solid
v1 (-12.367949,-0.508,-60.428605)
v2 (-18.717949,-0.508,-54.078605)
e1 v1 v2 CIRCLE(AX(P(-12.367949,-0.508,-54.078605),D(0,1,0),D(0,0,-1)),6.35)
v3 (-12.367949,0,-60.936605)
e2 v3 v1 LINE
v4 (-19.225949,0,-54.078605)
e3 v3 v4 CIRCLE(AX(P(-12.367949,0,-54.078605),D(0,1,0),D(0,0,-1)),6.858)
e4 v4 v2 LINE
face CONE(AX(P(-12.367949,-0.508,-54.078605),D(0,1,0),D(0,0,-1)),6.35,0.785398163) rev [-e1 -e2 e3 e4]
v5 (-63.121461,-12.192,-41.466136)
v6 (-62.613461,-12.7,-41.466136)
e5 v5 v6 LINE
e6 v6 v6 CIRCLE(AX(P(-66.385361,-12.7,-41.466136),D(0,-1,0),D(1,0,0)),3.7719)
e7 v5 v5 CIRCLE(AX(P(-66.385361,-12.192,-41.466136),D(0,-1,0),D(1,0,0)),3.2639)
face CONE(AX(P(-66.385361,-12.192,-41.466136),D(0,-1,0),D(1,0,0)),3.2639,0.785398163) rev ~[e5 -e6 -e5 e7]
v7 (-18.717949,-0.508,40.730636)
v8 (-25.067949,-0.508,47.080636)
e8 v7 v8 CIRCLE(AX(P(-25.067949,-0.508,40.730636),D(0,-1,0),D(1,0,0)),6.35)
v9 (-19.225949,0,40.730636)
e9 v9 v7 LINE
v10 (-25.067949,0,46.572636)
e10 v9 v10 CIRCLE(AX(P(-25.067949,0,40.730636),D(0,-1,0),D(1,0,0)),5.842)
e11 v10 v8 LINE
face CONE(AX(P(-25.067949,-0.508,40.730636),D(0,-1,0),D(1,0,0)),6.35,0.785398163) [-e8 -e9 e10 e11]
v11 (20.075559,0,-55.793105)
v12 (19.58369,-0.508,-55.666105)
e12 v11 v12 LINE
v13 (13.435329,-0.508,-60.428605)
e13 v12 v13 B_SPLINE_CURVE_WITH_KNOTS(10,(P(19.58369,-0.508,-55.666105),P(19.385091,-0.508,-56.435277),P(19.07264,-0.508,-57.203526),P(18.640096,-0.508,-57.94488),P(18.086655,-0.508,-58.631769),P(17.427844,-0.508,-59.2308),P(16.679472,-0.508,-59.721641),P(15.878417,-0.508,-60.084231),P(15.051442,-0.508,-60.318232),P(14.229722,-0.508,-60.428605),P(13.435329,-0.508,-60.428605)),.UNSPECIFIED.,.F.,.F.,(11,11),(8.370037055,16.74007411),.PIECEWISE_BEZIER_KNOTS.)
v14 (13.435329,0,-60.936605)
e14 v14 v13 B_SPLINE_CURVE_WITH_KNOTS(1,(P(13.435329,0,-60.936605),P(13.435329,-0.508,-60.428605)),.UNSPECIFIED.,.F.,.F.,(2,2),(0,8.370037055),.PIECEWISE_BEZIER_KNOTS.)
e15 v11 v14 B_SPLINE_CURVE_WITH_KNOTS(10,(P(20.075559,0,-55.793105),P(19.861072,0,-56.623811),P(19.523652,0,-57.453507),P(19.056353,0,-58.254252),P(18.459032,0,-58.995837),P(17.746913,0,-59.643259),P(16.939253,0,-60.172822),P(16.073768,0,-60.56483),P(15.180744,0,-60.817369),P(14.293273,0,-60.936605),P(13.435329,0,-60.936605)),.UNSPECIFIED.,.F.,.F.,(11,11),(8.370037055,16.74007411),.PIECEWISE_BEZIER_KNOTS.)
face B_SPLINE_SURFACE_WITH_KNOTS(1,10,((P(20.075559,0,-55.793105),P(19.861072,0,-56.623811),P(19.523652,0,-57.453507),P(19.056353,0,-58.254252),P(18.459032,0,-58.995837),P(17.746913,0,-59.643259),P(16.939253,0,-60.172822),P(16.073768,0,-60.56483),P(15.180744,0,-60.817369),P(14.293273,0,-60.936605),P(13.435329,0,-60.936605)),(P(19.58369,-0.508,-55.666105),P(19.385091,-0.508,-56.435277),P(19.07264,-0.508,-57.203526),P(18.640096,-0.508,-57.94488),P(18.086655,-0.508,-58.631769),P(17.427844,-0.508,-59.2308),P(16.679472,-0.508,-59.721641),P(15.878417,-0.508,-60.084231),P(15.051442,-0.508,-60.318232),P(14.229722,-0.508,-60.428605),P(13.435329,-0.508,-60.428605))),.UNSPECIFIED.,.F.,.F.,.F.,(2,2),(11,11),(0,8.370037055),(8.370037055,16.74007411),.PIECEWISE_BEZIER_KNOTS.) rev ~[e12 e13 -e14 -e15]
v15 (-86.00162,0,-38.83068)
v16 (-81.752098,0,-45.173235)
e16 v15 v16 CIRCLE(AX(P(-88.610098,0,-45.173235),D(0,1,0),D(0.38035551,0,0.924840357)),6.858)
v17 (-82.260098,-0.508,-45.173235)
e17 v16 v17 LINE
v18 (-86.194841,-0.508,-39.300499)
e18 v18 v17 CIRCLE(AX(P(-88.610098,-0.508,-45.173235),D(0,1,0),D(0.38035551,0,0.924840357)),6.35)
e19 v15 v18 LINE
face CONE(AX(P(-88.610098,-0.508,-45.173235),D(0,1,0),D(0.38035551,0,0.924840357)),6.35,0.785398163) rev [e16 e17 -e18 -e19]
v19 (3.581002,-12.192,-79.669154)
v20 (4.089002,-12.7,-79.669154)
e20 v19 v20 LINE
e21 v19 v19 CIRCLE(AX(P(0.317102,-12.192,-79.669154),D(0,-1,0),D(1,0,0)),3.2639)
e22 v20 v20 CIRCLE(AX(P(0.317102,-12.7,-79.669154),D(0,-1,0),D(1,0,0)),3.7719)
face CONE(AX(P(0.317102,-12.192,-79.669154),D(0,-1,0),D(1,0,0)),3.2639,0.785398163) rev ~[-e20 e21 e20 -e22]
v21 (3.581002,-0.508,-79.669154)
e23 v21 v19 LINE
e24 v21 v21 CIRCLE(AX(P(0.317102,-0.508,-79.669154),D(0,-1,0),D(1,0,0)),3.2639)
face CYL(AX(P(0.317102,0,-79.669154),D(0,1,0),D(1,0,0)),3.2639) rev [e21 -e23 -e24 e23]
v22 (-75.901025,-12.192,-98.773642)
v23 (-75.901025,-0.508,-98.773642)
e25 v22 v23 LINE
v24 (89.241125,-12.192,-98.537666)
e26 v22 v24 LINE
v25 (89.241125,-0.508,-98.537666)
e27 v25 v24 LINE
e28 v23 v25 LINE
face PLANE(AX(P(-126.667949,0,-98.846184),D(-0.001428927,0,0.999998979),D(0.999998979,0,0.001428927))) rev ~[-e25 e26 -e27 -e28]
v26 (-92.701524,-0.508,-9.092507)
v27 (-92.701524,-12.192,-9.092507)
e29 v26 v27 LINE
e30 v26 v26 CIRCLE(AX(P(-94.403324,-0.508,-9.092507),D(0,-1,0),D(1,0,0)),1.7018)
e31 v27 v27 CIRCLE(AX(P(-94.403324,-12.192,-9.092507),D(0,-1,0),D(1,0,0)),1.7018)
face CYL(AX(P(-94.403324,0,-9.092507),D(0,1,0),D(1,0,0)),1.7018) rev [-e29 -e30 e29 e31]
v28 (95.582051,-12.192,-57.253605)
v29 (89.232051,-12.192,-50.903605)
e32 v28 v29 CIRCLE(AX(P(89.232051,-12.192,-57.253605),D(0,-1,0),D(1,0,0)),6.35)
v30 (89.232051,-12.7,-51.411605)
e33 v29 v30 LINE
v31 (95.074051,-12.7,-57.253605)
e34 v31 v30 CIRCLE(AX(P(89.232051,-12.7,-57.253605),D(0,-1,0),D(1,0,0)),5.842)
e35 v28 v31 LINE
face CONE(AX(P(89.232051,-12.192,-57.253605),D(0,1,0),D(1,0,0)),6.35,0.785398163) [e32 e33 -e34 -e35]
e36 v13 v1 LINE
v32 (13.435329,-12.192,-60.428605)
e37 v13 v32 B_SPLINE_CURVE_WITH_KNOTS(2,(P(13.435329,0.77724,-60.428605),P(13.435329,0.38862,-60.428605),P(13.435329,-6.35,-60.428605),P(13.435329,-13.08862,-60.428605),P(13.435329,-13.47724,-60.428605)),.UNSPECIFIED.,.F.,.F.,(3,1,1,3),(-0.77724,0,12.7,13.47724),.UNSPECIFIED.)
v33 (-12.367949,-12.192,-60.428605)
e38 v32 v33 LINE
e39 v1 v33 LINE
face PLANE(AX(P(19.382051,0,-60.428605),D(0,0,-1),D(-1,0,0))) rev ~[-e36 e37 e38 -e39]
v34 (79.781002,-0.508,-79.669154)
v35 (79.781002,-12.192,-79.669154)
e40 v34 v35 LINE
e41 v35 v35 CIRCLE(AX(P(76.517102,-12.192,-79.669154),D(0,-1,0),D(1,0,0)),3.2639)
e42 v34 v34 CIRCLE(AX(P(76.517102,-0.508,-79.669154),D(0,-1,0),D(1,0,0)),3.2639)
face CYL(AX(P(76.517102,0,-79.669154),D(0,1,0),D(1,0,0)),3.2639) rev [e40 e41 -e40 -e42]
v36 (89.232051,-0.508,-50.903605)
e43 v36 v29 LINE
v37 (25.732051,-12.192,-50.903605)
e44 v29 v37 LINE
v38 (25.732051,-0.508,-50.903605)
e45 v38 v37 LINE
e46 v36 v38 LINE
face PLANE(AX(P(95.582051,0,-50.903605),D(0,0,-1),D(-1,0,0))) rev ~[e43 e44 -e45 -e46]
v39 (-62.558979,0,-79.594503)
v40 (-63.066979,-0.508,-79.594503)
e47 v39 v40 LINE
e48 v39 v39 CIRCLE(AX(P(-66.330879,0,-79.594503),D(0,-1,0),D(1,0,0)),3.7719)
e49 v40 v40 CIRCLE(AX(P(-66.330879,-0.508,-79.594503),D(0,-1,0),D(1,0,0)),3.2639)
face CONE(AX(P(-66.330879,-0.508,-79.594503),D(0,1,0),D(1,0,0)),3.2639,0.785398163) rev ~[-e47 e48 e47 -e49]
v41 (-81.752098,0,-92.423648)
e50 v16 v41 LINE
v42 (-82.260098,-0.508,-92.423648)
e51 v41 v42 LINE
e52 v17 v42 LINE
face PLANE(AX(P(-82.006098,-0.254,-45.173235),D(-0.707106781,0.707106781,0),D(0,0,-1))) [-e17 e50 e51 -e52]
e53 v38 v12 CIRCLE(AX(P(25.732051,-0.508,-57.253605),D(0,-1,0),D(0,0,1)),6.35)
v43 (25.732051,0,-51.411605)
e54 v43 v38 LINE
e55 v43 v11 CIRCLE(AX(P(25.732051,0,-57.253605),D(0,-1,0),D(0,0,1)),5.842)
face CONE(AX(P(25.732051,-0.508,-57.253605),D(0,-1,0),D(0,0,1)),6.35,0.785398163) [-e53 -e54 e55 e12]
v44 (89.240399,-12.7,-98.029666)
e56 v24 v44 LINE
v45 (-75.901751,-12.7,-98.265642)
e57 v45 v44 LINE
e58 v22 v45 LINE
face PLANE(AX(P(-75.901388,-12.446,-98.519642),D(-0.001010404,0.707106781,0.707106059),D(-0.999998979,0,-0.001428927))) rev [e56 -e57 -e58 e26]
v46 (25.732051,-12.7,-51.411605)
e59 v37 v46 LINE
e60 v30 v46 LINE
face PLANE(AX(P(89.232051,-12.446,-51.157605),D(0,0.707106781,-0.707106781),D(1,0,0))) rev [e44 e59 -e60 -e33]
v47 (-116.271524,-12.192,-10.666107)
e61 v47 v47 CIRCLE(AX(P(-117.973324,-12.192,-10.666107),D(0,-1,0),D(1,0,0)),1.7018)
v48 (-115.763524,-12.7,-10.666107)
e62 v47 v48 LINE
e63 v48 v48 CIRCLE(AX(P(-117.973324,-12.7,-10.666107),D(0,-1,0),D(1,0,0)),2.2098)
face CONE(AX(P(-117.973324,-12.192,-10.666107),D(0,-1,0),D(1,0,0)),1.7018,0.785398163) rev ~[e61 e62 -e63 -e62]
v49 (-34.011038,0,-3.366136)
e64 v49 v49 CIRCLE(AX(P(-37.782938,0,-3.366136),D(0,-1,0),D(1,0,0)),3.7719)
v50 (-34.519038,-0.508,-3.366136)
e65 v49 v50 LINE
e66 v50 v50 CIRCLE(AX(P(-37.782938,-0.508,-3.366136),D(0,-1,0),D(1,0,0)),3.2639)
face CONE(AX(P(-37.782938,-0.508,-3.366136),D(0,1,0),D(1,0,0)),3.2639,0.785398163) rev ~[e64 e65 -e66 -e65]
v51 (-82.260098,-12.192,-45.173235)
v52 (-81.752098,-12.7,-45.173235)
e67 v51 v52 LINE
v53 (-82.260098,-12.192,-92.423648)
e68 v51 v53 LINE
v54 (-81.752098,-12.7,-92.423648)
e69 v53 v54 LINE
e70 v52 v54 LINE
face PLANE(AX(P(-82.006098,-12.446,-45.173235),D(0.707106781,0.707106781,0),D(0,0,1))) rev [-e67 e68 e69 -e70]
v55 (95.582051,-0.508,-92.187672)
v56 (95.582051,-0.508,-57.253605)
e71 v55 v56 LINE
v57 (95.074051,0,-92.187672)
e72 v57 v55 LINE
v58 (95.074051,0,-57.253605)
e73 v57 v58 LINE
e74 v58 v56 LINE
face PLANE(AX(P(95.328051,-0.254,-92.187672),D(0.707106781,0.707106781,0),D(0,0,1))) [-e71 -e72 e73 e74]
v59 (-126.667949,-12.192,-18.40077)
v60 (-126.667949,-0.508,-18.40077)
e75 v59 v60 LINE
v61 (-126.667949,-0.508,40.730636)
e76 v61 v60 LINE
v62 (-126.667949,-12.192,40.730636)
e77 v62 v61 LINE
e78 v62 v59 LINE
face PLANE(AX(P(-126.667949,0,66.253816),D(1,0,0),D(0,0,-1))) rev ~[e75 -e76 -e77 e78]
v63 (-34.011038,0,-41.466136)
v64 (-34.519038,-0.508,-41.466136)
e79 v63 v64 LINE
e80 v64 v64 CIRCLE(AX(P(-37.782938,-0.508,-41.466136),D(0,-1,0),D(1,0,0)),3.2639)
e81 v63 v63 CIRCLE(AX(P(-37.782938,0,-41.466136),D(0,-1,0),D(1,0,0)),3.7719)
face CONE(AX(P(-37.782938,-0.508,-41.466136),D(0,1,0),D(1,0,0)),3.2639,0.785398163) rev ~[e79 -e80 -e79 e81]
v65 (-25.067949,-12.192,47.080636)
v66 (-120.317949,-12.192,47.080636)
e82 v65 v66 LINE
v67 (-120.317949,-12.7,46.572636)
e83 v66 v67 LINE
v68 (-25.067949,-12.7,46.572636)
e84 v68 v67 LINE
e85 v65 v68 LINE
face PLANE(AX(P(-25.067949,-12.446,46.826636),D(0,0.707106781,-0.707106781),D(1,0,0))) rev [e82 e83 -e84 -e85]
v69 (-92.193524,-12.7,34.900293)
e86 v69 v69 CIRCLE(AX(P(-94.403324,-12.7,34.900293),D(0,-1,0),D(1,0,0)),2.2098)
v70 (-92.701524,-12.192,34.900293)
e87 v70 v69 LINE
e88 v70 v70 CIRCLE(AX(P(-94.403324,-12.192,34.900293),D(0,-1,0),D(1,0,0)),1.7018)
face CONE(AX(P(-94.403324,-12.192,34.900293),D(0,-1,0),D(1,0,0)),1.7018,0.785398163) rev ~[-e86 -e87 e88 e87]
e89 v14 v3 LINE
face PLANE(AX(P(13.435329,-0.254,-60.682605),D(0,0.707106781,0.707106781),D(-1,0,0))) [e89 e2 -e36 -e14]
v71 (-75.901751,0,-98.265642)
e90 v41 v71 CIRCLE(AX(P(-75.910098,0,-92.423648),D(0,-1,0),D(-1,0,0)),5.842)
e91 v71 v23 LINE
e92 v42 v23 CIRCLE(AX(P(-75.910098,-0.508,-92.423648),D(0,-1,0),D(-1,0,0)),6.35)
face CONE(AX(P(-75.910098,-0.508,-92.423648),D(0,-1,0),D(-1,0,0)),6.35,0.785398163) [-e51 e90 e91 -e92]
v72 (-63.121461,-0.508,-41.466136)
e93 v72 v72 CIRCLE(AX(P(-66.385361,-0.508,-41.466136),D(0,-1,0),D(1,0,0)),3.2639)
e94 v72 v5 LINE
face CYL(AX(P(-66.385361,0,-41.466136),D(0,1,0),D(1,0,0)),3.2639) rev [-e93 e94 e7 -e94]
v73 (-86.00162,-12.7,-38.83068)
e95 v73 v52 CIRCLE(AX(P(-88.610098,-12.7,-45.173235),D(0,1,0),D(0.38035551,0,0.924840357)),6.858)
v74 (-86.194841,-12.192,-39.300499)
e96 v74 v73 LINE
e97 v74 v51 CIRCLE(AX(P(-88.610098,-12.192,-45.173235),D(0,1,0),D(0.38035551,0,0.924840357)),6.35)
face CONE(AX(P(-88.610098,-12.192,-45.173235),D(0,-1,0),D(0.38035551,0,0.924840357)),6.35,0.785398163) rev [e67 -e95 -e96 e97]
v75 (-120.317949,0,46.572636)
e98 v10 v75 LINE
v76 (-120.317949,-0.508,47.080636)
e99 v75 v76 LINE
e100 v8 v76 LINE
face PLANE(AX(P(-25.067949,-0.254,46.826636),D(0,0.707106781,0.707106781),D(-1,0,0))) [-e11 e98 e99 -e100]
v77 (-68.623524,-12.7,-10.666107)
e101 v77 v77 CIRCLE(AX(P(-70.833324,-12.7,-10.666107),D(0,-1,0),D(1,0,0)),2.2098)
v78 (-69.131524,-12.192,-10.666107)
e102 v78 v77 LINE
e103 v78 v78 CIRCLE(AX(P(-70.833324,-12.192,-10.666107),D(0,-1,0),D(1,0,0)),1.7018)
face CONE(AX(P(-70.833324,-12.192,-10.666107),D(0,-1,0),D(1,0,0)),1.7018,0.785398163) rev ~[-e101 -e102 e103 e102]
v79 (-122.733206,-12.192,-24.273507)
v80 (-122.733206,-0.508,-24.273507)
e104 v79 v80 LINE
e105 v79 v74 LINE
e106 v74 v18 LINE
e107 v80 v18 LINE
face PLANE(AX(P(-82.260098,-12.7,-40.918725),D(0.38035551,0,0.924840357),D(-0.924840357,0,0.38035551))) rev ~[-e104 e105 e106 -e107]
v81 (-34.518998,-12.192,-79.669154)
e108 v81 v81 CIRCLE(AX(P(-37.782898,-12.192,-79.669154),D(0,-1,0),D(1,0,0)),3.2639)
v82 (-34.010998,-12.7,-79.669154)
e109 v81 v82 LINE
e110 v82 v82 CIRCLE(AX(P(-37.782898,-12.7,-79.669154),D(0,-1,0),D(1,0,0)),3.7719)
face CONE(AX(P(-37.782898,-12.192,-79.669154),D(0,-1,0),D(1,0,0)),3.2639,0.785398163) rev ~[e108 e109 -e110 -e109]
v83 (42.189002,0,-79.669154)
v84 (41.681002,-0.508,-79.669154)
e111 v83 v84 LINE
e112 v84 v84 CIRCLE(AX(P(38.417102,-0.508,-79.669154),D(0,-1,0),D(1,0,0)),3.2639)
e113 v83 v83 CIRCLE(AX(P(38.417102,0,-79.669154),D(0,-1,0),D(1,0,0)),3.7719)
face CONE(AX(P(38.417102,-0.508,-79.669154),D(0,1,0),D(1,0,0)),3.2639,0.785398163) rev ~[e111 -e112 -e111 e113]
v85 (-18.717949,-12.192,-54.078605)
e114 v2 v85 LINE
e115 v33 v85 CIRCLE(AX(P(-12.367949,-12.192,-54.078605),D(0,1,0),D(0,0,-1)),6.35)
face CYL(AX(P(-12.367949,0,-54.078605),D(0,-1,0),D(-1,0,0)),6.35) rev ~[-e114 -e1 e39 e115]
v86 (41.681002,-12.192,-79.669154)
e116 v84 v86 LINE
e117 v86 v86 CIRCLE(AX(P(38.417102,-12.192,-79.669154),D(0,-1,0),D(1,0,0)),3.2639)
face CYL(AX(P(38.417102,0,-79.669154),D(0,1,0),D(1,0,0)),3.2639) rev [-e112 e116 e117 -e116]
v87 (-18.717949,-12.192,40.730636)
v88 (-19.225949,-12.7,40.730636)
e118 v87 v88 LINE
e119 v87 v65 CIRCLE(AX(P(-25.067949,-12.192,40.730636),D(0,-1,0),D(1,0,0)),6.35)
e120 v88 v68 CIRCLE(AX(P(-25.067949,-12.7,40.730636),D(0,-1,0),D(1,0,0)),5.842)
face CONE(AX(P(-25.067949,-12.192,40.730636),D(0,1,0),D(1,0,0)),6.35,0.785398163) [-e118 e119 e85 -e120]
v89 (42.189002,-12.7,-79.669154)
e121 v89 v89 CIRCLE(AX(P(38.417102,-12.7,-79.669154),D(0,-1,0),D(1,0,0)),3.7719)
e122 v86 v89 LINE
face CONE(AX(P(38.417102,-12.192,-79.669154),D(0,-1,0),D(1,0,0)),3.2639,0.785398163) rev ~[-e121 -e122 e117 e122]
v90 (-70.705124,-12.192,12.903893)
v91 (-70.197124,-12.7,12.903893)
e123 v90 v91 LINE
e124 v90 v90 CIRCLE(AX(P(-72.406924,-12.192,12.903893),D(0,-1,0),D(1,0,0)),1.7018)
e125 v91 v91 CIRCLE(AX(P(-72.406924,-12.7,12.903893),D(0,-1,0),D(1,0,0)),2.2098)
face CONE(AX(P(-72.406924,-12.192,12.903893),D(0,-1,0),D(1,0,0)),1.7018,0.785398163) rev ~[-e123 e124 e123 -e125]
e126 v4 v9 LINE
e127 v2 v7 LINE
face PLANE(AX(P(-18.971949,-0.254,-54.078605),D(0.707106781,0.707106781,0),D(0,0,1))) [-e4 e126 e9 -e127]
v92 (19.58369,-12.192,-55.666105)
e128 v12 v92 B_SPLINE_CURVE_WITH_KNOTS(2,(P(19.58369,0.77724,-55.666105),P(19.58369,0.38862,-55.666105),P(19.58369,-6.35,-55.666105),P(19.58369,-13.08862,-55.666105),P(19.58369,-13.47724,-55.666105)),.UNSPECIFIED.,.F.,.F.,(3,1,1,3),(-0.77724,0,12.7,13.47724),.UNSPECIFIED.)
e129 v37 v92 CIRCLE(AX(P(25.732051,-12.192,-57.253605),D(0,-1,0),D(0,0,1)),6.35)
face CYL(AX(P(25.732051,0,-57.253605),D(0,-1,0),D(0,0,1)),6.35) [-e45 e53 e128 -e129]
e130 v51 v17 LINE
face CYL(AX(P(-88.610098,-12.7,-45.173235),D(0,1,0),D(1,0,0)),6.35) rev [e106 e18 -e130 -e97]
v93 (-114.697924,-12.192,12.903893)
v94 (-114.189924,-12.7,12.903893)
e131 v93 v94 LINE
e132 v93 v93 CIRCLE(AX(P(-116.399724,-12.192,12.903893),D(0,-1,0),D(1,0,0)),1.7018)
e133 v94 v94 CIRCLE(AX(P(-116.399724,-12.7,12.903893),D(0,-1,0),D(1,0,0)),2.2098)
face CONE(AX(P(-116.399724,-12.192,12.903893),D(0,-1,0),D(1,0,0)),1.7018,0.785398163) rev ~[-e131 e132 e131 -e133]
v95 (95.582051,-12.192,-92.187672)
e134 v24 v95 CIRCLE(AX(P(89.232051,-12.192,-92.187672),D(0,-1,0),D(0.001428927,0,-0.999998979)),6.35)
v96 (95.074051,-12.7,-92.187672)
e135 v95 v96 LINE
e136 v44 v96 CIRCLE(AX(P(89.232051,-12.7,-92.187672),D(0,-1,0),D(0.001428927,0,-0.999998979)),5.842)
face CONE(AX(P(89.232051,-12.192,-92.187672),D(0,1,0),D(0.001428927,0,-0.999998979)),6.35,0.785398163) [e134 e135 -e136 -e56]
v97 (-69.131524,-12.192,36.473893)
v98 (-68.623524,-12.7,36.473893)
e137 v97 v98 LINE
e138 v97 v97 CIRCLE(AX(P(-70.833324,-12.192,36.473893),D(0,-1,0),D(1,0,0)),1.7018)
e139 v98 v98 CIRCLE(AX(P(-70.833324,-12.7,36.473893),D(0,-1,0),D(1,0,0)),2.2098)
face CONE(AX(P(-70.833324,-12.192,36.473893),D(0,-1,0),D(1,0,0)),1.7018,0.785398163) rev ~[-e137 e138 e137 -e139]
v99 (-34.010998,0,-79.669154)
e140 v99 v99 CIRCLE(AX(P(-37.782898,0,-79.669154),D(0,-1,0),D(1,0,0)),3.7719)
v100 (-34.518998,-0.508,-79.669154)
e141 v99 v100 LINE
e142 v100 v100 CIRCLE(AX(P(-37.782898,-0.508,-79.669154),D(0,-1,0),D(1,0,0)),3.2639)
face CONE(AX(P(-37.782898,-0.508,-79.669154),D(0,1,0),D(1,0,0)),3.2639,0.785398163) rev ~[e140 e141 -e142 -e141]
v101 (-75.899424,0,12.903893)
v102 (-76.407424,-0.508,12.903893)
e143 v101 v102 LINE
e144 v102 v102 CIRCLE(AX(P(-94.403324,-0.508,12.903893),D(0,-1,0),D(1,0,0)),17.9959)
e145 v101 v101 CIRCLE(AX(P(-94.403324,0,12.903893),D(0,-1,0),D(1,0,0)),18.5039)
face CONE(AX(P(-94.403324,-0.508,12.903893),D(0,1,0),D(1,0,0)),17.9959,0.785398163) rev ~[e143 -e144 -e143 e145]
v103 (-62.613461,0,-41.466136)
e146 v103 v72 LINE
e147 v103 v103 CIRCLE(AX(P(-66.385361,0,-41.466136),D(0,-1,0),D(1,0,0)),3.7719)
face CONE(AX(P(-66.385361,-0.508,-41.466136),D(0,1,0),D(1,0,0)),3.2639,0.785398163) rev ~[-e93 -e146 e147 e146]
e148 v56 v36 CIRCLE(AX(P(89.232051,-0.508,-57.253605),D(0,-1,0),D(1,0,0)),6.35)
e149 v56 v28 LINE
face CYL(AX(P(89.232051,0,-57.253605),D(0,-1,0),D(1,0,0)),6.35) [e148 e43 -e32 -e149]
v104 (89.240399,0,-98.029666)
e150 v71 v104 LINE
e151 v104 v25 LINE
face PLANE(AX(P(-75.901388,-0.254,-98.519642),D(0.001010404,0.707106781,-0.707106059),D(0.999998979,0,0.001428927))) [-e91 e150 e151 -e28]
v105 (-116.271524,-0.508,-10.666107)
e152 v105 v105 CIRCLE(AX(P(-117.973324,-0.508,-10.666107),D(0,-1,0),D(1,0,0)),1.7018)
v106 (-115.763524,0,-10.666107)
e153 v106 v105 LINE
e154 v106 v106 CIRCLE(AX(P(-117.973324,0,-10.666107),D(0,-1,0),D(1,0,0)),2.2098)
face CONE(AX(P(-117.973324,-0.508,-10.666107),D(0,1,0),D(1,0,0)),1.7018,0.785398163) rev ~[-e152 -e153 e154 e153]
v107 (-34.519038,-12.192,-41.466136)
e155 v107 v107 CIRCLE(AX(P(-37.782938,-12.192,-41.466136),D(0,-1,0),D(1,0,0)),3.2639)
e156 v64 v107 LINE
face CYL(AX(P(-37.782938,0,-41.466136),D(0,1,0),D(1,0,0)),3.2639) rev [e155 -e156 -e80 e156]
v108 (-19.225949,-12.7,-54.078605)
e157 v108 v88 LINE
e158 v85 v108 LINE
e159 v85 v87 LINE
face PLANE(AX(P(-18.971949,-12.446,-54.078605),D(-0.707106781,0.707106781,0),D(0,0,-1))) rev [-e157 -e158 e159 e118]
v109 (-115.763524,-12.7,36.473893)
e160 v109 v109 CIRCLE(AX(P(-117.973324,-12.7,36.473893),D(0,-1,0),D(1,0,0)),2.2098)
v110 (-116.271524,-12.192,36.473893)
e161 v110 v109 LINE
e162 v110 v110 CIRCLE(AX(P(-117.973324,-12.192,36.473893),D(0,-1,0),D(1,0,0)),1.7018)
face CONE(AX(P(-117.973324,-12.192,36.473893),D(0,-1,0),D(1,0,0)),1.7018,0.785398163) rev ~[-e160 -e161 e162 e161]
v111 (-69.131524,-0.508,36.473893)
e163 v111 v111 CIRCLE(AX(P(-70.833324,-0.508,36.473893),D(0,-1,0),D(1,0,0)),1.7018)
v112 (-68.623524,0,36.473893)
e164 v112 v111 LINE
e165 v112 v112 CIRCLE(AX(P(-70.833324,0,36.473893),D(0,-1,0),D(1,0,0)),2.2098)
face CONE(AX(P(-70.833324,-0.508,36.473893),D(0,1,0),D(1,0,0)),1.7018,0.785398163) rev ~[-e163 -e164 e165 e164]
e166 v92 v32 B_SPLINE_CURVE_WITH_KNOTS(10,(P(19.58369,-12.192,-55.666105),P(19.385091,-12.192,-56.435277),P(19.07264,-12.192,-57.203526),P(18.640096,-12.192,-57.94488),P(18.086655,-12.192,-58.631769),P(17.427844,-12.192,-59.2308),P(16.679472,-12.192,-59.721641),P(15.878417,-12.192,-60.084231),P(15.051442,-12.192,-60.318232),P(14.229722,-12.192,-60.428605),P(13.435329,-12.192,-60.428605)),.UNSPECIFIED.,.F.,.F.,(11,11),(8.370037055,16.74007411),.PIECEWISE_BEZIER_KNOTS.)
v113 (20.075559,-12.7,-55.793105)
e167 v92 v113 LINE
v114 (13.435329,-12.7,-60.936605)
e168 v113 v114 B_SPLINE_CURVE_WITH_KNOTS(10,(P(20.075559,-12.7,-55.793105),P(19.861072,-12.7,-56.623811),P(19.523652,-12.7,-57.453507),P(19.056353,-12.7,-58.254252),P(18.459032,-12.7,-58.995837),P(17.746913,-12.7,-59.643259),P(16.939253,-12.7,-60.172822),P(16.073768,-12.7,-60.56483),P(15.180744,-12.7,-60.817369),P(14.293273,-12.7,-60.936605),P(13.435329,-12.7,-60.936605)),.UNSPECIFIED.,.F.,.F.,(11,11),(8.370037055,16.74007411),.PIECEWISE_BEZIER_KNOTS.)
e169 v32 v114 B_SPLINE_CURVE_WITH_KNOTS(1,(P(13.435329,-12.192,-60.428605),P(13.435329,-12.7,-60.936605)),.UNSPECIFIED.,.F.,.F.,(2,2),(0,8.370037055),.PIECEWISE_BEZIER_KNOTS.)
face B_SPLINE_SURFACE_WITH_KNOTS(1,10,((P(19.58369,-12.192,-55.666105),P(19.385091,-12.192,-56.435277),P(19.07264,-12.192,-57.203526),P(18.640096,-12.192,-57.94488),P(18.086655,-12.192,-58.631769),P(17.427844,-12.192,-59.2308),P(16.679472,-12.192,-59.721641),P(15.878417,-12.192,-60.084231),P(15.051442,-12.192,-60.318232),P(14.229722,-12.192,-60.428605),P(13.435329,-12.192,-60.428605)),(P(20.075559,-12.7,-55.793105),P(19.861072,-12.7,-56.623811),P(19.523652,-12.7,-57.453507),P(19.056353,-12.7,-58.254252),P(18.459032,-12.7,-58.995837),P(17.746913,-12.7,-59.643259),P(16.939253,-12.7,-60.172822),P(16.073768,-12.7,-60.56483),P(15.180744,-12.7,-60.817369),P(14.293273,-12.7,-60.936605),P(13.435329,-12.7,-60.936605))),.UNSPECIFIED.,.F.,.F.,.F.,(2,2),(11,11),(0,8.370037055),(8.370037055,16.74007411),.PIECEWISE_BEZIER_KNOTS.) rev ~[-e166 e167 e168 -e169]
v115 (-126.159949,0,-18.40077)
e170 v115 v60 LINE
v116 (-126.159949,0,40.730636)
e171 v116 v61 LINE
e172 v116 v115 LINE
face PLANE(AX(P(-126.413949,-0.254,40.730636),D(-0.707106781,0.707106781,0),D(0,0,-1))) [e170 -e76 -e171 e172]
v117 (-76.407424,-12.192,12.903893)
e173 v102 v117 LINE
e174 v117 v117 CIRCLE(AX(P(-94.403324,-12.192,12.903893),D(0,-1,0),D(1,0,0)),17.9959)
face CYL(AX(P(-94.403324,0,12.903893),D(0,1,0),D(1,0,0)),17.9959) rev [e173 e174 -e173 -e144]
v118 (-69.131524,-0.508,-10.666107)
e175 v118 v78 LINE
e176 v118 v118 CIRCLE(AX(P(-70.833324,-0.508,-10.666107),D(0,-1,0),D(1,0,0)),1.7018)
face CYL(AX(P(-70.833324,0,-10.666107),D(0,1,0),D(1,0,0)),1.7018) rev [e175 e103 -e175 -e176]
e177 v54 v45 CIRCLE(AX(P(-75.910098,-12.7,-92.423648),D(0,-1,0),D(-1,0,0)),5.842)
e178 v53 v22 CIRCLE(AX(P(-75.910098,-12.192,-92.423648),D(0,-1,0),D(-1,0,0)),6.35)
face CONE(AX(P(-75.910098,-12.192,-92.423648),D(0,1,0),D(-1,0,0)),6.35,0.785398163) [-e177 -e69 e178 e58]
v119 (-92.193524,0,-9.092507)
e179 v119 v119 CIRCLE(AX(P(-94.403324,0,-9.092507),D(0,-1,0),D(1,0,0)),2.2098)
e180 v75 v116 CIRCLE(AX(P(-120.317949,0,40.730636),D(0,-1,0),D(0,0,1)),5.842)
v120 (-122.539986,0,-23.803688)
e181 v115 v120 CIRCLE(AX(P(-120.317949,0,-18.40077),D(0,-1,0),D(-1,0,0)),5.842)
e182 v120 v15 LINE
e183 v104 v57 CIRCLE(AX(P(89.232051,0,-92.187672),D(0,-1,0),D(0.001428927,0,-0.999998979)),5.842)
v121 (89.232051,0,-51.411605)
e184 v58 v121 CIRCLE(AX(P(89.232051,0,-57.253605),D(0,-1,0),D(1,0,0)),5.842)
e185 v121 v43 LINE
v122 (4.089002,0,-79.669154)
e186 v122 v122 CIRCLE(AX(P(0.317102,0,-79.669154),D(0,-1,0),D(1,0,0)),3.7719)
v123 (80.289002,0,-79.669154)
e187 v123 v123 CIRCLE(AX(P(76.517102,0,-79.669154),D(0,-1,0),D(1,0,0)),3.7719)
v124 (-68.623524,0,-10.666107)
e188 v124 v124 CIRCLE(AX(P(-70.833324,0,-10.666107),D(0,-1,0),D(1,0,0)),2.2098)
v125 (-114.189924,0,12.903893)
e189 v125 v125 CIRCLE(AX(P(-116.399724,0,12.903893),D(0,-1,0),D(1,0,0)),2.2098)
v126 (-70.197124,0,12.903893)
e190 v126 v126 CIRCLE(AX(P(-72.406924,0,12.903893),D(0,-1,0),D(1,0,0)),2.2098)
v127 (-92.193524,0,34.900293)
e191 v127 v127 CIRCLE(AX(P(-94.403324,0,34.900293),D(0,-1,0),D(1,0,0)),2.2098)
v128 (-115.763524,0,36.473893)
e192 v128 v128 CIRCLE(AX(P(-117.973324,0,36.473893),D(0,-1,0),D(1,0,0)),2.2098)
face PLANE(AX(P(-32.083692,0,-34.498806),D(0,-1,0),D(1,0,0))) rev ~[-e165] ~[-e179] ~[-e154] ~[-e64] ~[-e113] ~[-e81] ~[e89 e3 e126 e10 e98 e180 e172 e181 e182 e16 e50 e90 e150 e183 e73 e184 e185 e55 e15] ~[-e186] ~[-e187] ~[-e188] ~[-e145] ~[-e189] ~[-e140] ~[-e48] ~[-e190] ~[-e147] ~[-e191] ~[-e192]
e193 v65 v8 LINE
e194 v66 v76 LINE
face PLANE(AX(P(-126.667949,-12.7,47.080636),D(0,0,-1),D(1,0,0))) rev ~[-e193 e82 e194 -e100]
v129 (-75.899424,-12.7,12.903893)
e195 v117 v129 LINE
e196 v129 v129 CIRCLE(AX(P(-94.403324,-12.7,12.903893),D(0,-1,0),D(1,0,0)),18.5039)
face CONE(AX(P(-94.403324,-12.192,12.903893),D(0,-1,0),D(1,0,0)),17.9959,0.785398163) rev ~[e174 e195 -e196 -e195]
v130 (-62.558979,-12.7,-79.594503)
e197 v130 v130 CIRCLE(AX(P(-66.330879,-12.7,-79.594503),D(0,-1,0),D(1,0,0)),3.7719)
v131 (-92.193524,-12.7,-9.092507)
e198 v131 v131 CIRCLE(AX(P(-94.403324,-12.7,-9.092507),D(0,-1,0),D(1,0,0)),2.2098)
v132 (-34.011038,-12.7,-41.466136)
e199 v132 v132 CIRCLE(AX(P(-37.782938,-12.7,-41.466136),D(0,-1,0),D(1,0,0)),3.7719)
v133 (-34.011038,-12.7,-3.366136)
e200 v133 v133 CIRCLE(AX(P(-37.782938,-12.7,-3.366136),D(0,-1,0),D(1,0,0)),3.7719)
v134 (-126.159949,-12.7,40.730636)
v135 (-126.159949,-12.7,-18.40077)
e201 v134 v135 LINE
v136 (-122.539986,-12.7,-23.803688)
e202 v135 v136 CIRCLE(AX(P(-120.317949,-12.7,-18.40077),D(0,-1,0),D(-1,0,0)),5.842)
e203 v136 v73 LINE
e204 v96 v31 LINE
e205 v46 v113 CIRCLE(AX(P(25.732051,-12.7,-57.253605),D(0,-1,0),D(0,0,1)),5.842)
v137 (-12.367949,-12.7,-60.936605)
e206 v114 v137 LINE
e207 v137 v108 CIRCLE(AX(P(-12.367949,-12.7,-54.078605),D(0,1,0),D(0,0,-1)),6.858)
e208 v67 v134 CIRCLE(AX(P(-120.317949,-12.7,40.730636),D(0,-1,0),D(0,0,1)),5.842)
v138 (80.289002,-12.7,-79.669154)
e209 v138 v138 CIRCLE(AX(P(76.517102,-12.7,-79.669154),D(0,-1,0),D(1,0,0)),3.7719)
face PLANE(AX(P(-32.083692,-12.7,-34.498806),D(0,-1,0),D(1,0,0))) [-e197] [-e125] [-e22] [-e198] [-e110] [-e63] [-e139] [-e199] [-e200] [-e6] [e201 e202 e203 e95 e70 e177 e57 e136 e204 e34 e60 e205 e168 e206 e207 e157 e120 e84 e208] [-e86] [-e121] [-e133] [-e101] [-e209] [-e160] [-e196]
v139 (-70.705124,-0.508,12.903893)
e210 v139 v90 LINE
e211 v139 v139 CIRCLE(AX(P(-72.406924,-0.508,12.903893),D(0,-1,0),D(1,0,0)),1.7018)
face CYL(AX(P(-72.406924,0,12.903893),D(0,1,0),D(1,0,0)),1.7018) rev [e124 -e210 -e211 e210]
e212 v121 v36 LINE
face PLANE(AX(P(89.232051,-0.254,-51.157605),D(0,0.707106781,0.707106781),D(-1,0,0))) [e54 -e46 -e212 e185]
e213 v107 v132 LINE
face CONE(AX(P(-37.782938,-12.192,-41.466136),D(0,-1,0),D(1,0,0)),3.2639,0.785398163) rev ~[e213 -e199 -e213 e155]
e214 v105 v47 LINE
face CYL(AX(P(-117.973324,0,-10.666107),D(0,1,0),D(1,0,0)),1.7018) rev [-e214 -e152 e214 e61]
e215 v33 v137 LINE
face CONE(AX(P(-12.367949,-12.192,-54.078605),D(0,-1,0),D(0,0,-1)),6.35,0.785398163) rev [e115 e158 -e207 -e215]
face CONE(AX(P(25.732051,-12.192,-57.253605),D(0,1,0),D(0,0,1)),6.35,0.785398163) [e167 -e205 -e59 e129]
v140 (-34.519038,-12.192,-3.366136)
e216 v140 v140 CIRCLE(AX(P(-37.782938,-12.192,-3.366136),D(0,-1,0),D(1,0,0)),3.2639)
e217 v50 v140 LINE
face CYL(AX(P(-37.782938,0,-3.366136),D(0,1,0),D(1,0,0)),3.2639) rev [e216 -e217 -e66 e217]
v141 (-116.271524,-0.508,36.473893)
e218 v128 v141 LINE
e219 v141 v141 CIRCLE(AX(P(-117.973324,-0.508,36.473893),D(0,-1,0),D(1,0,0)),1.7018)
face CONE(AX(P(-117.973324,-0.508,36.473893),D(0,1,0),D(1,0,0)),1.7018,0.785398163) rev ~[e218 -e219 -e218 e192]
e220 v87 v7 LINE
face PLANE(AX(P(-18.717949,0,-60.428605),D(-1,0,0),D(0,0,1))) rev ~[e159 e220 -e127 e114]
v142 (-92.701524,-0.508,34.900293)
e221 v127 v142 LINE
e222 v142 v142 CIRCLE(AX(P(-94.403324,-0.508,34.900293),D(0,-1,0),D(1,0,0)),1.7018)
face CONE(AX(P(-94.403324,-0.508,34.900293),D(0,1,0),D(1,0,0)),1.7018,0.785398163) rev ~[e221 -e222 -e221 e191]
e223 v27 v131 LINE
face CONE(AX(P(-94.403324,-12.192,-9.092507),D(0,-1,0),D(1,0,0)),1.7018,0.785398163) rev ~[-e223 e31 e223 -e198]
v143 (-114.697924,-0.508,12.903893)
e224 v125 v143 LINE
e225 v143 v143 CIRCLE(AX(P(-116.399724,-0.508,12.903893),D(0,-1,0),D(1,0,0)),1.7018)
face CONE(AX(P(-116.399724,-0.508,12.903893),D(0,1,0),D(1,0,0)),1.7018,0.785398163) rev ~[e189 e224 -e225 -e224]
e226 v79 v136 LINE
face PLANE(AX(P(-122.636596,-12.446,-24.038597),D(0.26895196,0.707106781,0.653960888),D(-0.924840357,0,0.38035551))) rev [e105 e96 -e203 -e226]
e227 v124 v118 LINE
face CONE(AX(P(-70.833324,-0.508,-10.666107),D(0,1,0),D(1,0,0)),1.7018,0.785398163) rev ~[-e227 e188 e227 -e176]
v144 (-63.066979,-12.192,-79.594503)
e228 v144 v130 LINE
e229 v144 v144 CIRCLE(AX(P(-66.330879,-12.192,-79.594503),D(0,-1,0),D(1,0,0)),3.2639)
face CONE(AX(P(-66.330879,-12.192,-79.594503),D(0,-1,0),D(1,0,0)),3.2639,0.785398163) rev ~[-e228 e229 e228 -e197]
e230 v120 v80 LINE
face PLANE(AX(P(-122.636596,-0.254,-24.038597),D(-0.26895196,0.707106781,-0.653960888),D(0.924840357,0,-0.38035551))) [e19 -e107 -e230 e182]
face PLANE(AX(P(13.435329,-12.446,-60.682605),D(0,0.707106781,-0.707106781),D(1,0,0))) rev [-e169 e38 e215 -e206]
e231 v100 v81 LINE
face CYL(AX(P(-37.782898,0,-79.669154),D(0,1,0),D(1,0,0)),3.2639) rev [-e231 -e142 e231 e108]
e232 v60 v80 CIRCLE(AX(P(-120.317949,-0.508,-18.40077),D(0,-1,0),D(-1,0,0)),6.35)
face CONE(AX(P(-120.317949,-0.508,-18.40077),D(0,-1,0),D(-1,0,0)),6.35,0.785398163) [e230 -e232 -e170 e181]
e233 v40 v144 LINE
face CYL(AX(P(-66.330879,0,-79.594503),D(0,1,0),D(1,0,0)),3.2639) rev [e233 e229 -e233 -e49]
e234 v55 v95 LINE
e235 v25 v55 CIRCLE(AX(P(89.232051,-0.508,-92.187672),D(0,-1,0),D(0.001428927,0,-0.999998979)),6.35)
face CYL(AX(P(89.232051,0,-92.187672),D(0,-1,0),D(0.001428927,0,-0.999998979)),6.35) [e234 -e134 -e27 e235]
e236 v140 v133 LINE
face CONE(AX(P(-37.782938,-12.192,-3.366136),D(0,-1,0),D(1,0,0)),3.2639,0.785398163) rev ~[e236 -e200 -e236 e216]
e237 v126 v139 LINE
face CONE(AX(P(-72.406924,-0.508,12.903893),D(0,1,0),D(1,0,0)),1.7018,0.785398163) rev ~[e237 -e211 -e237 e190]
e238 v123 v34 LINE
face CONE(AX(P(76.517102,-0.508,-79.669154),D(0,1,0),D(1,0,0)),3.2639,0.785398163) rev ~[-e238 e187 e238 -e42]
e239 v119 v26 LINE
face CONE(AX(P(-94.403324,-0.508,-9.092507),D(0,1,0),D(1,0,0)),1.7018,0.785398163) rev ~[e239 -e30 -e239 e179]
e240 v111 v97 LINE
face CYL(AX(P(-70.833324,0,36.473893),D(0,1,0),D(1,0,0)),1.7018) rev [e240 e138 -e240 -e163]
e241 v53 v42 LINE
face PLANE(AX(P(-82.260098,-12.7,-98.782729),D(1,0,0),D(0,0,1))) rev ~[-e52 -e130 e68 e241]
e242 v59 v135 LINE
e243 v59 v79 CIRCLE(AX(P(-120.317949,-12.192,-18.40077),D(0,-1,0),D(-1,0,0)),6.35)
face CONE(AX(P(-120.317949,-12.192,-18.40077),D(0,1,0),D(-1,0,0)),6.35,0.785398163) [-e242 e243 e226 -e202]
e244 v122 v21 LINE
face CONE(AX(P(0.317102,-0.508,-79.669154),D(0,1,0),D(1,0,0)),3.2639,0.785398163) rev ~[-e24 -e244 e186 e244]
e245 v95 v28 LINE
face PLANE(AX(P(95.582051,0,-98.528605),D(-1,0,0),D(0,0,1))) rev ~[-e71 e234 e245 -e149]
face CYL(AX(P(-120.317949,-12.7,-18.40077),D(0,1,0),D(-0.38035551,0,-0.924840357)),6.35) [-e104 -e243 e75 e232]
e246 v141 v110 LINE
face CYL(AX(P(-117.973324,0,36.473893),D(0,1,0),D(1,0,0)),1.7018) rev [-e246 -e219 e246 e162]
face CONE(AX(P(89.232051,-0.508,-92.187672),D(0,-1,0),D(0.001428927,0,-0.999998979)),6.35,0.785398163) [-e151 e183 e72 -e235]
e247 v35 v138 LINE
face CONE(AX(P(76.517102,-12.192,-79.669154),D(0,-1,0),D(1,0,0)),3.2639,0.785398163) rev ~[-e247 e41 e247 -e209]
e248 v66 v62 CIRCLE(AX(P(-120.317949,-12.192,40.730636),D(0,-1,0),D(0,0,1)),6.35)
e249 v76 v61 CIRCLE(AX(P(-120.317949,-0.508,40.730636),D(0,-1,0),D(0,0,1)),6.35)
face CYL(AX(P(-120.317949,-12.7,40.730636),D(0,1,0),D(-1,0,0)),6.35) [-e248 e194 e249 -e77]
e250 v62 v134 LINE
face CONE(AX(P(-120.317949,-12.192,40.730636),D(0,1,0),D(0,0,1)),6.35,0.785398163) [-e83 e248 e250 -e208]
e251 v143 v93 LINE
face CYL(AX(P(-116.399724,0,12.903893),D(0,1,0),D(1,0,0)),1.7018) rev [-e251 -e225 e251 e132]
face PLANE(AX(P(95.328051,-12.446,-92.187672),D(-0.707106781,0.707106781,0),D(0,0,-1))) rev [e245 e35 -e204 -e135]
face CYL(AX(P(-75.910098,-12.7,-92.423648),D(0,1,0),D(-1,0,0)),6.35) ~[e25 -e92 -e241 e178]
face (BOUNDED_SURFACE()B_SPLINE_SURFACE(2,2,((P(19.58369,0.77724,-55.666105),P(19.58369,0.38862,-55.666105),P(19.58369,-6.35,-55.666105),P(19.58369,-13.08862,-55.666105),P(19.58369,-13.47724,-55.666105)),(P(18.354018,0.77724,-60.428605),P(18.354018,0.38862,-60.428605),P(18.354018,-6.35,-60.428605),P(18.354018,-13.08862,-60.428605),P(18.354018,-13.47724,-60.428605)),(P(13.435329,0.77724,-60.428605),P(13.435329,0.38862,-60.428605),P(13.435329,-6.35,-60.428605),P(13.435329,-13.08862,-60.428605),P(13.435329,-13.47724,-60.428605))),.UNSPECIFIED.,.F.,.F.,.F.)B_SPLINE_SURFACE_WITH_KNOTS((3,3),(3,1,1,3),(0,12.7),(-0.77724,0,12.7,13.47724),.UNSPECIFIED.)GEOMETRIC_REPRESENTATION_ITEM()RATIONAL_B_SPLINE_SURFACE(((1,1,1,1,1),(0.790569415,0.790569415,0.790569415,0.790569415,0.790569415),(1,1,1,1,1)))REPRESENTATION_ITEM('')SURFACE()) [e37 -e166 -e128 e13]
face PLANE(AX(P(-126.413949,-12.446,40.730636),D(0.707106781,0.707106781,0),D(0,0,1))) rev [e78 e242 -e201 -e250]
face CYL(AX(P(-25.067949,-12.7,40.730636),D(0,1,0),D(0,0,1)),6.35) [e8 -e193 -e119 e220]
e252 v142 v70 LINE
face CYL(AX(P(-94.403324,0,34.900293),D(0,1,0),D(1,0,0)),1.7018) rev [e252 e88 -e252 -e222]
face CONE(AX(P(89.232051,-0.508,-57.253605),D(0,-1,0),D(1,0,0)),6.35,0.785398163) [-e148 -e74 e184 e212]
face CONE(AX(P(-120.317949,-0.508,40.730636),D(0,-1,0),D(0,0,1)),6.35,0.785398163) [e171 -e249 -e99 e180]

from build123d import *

# Parameters (mm, degrees)
F0_R     = 3.2639
F0_R_2   = 1.7018
F0_R_3   = 17.9959
F1_DEPTH = 12.7
F2_W     = 107.95
F2_H     = 19.1731796932
F3_DEPTH = 25.4
F4_F1_R  = 6.35
F4_F2_R  = 6.35
F5_R     = 6.35
F6_SIZE  = 0.508


# Not quite as in the source:
# - a feature names something its author has since deleted; it is built from what else it names


with BuildPart() as f1:
    # F0 (on Front) → F1 (new body)
    with BuildSketch(Plane.XZ):
        Polygon((-126.667948618, -98.8461842824), (95.582051382, -98.5286048876), (95.582051382, -60.4286048876), (95.582051382, -50.9036048876), (19.382051382, -50.9036048876), (19.382051382, -60.4286048876), (-18.717948618, -60.4286048876), (-18.717948618, 66.2538157176), (-126.667948618, 66.2538157176), align=None)
        with Locations((-66.3308787224, -79.5945032566)):
            Circle(F0_R, mode=Mode.SUBTRACT)
        with Locations((-37.7828981478, -79.6691544378)):
            Circle(F0_R, mode=Mode.SUBTRACT)
        with Locations((-66.3853614397, -41.4661356021)):
            Circle(F0_R, mode=Mode.SUBTRACT)
        with Locations((-37.7829381848, -41.4661356021)):
            Circle(F0_R, mode=Mode.SUBTRACT)
        with Locations((0.3171018521, -79.6691544378)):
            Circle(F0_R, mode=Mode.SUBTRACT)
        with Locations((38.4171018521, -79.6691544378)):
            Circle(F0_R, mode=Mode.SUBTRACT)
        with Locations((76.5171018521, -79.6691544378)):
            Circle(F0_R, mode=Mode.SUBTRACT)
        with Locations((-117.9733242227, -10.6661073038)):
            Circle(F0_R_2, mode=Mode.SUBTRACT)
        with Locations((-94.4033242227, -9.0925073038)):
            Circle(F0_R_2, mode=Mode.SUBTRACT)
        with Locations((-116.3997242227, 12.9038926962)):
            Circle(F0_R_2, mode=Mode.SUBTRACT)
        with Locations((-94.4033242227, 12.9038926962)):
            Circle(F0_R_3, mode=Mode.SUBTRACT)
        with Locations((-72.4069242227, 12.9038926962)):
            Circle(F0_R_2, mode=Mode.SUBTRACT)
        with Locations((-70.8333242227, -10.6661073038)):
            Circle(F0_R_2, mode=Mode.SUBTRACT)
        with Locations((-37.7829381848, -3.3661356021)):
            Circle(F0_R, mode=Mode.SUBTRACT)
        with Locations((-117.9733242227, 36.4738926962)):
            Circle(F0_R_2, mode=Mode.SUBTRACT)
        with Locations((-94.4033242227, 34.9002926962)):
            Circle(F0_R_2, mode=Mode.SUBTRACT)
        with Locations((-70.8333242227, 36.4738926962)):
            Circle(F0_R_2, mode=Mode.SUBTRACT)
    extrude(amount=F1_DEPTH)

    # F2 (on face) → F3 (cut)
    with BuildSketch(Plane.XZ.offset(12.7)):
        Polygon((-82.2600983048, -40.9187248283), (-126.667948618, -22.6552803069), (-126.667948618, -98.8461842824), (-82.2600983048, -98.7827286323), align=None)
        with Locations((-72.692948618, 56.6672258711)):
            Rectangle(F2_W, F2_H)
    extrude(amount=-F3_DEPTH, mode=Mode.SUBTRACT)

    # F4: fillet of radius 6.35 on 9 edges, made by hand

    # F4_f1
    f4_f1_edges = [f1.edges().sort_by_distance(p)[0] for p in [
        (-82.2600983048, -6.35, -40.9187248283),
        (-18.717948618, -6.35, -60.4286048876),
    ]]
    fillet(f4_f1_edges, radius=F4_F1_R)

    # F4_f2
    f4_f2_edges = [f1.edges().sort_by_distance(p)[0] for p in [
        (-126.667948618, -6.35, 47.0806360245),
        (-126.667948618, -6.35, -22.6552803069),
        (-18.717948618, -6.35, 47.0806360245),
        (-82.2600983048, -6.35, -98.7827286323),
        (95.582051382, -6.35, -98.5286048876),
        (95.582051382, -6.35, -50.9036048876),
        (19.382051382, -6.35, -50.9036048876),
    ]]
    fillet(f4_f2_edges, radius=F4_F2_R)

    # F5
    f5_edges = [f1.edges().sort_by_distance(p)[0] for p in [
        (19.382051, -6.35, -60.428605),
    ]]
    fillet(f5_edges, radius=F5_R)

    # F6
    f6_edges = [f1.edges().sort_by_distance(p)[0] for p in [
        (21.843486, -12.7, -52.233489),
        (17.323894, -12.7, -59.098721),
        (57.482051, -12.7, -50.903605),
        (0.53369, -12.7, -60.428605),
        (93.722179, -12.7, -52.763477),
        (-16.858077, -12.7, -58.568733),
        (95.582051, -12.7, -74.720638),
        (-18.717949, -12.7, -6.673984),
        (93.725386, -12.7, -96.674591),
        (-20.577821, -12.7, 45.220764),
        (6.67005, -12.7, -98.655654),
        (-72.692949, -12.7, 47.080636),
        (-80.397017, -12.7, -96.916983),
        (-124.808077, -12.7, 45.220764),
        (-82.260098, -12.7, -68.798442),
        (-126.667949, -12.7, 11.164933),
        (-83.334713, -12.7, -41.638718),
        (-125.593334, -12.7, -21.935287),
        (-104.464023, -12.7, -31.787003),
        (-69.594779, -12.7, -79.594503),
        (-41.046798, -12.7, -79.669154),
        (-69.649261, -12.7, -41.466136),
        (-41.046838, -12.7, -41.466136),
        (-2.946798, -12.7, -79.669154),
        (35.153202, -12.7, -79.669154),
        (73.253202, -12.7, -79.669154),
        (-119.675124, -12.7, -10.666107),
        (-96.105124, -12.7, -9.092507),
        (-72.535124, -12.7, -10.666107),
        (-41.046838, -12.7, -3.366136),
        (-118.101524, -12.7, 12.903893),
        (-112.399224, -12.7, 12.903893),
        (-74.108724, -12.7, 12.903893),
        (-119.675124, -12.7, 36.473893),
        (-96.105124, -12.7, 34.900293),
        (-72.535124, -12.7, 36.473893),
        (21.843486, 0, -52.233489),
        (17.323894, 0, -59.098721),
        (57.482051, 0, -50.903605),
        (0.53369, 0, -60.428605),
        (93.722179, 0, -52.763477),
        (-16.858077, 0, -58.568733),
        (95.582051, 0, -74.720638),
        (-18.717949, 0, -6.673984),
        (93.725386, 0, -96.674591),
        (-20.577821, 0, 45.220764),
        (6.67005, 0, -98.655654),
        (-72.692949, 0, 47.080636),
        (-80.397017, 0, -96.916983),
        (-124.808077, 0, 45.220764),
        (-82.260098, 0, -68.798442),
        (-126.667949, 0, 11.164933),
        (-83.334713, 0, -41.638718),
        (-125.593334, 0, -21.935287),
        (-104.464023, 0, -31.787003),
        (-69.594779, 0, -79.594503),
        (-41.046798, 0, -79.669154),
        (-69.649261, 0, -41.466136),
        (-41.046838, 0, -41.466136),
        (-2.946798, 0, -79.669154),
        (35.153202, 0, -79.669154),
        (73.253202, 0, -79.669154),
        (-119.675124, 0, -10.666107),
        (-96.105124, 0, -9.092507),
        (-72.535124, 0, -10.666107),
        (-41.046838, 0, -3.366136),
        (-118.101524, 0, 12.903893),
        (-112.399224, 0, 12.903893),
        (-74.108724, 0, 12.903893),
        (-119.675124, 0, 36.473893),
        (-96.105124, 0, 34.900293),
        (-72.535124, 0, 36.473893),
    ]]
    chamfer(f6_edges, length=F6_SIZE)


solid = f1.part
